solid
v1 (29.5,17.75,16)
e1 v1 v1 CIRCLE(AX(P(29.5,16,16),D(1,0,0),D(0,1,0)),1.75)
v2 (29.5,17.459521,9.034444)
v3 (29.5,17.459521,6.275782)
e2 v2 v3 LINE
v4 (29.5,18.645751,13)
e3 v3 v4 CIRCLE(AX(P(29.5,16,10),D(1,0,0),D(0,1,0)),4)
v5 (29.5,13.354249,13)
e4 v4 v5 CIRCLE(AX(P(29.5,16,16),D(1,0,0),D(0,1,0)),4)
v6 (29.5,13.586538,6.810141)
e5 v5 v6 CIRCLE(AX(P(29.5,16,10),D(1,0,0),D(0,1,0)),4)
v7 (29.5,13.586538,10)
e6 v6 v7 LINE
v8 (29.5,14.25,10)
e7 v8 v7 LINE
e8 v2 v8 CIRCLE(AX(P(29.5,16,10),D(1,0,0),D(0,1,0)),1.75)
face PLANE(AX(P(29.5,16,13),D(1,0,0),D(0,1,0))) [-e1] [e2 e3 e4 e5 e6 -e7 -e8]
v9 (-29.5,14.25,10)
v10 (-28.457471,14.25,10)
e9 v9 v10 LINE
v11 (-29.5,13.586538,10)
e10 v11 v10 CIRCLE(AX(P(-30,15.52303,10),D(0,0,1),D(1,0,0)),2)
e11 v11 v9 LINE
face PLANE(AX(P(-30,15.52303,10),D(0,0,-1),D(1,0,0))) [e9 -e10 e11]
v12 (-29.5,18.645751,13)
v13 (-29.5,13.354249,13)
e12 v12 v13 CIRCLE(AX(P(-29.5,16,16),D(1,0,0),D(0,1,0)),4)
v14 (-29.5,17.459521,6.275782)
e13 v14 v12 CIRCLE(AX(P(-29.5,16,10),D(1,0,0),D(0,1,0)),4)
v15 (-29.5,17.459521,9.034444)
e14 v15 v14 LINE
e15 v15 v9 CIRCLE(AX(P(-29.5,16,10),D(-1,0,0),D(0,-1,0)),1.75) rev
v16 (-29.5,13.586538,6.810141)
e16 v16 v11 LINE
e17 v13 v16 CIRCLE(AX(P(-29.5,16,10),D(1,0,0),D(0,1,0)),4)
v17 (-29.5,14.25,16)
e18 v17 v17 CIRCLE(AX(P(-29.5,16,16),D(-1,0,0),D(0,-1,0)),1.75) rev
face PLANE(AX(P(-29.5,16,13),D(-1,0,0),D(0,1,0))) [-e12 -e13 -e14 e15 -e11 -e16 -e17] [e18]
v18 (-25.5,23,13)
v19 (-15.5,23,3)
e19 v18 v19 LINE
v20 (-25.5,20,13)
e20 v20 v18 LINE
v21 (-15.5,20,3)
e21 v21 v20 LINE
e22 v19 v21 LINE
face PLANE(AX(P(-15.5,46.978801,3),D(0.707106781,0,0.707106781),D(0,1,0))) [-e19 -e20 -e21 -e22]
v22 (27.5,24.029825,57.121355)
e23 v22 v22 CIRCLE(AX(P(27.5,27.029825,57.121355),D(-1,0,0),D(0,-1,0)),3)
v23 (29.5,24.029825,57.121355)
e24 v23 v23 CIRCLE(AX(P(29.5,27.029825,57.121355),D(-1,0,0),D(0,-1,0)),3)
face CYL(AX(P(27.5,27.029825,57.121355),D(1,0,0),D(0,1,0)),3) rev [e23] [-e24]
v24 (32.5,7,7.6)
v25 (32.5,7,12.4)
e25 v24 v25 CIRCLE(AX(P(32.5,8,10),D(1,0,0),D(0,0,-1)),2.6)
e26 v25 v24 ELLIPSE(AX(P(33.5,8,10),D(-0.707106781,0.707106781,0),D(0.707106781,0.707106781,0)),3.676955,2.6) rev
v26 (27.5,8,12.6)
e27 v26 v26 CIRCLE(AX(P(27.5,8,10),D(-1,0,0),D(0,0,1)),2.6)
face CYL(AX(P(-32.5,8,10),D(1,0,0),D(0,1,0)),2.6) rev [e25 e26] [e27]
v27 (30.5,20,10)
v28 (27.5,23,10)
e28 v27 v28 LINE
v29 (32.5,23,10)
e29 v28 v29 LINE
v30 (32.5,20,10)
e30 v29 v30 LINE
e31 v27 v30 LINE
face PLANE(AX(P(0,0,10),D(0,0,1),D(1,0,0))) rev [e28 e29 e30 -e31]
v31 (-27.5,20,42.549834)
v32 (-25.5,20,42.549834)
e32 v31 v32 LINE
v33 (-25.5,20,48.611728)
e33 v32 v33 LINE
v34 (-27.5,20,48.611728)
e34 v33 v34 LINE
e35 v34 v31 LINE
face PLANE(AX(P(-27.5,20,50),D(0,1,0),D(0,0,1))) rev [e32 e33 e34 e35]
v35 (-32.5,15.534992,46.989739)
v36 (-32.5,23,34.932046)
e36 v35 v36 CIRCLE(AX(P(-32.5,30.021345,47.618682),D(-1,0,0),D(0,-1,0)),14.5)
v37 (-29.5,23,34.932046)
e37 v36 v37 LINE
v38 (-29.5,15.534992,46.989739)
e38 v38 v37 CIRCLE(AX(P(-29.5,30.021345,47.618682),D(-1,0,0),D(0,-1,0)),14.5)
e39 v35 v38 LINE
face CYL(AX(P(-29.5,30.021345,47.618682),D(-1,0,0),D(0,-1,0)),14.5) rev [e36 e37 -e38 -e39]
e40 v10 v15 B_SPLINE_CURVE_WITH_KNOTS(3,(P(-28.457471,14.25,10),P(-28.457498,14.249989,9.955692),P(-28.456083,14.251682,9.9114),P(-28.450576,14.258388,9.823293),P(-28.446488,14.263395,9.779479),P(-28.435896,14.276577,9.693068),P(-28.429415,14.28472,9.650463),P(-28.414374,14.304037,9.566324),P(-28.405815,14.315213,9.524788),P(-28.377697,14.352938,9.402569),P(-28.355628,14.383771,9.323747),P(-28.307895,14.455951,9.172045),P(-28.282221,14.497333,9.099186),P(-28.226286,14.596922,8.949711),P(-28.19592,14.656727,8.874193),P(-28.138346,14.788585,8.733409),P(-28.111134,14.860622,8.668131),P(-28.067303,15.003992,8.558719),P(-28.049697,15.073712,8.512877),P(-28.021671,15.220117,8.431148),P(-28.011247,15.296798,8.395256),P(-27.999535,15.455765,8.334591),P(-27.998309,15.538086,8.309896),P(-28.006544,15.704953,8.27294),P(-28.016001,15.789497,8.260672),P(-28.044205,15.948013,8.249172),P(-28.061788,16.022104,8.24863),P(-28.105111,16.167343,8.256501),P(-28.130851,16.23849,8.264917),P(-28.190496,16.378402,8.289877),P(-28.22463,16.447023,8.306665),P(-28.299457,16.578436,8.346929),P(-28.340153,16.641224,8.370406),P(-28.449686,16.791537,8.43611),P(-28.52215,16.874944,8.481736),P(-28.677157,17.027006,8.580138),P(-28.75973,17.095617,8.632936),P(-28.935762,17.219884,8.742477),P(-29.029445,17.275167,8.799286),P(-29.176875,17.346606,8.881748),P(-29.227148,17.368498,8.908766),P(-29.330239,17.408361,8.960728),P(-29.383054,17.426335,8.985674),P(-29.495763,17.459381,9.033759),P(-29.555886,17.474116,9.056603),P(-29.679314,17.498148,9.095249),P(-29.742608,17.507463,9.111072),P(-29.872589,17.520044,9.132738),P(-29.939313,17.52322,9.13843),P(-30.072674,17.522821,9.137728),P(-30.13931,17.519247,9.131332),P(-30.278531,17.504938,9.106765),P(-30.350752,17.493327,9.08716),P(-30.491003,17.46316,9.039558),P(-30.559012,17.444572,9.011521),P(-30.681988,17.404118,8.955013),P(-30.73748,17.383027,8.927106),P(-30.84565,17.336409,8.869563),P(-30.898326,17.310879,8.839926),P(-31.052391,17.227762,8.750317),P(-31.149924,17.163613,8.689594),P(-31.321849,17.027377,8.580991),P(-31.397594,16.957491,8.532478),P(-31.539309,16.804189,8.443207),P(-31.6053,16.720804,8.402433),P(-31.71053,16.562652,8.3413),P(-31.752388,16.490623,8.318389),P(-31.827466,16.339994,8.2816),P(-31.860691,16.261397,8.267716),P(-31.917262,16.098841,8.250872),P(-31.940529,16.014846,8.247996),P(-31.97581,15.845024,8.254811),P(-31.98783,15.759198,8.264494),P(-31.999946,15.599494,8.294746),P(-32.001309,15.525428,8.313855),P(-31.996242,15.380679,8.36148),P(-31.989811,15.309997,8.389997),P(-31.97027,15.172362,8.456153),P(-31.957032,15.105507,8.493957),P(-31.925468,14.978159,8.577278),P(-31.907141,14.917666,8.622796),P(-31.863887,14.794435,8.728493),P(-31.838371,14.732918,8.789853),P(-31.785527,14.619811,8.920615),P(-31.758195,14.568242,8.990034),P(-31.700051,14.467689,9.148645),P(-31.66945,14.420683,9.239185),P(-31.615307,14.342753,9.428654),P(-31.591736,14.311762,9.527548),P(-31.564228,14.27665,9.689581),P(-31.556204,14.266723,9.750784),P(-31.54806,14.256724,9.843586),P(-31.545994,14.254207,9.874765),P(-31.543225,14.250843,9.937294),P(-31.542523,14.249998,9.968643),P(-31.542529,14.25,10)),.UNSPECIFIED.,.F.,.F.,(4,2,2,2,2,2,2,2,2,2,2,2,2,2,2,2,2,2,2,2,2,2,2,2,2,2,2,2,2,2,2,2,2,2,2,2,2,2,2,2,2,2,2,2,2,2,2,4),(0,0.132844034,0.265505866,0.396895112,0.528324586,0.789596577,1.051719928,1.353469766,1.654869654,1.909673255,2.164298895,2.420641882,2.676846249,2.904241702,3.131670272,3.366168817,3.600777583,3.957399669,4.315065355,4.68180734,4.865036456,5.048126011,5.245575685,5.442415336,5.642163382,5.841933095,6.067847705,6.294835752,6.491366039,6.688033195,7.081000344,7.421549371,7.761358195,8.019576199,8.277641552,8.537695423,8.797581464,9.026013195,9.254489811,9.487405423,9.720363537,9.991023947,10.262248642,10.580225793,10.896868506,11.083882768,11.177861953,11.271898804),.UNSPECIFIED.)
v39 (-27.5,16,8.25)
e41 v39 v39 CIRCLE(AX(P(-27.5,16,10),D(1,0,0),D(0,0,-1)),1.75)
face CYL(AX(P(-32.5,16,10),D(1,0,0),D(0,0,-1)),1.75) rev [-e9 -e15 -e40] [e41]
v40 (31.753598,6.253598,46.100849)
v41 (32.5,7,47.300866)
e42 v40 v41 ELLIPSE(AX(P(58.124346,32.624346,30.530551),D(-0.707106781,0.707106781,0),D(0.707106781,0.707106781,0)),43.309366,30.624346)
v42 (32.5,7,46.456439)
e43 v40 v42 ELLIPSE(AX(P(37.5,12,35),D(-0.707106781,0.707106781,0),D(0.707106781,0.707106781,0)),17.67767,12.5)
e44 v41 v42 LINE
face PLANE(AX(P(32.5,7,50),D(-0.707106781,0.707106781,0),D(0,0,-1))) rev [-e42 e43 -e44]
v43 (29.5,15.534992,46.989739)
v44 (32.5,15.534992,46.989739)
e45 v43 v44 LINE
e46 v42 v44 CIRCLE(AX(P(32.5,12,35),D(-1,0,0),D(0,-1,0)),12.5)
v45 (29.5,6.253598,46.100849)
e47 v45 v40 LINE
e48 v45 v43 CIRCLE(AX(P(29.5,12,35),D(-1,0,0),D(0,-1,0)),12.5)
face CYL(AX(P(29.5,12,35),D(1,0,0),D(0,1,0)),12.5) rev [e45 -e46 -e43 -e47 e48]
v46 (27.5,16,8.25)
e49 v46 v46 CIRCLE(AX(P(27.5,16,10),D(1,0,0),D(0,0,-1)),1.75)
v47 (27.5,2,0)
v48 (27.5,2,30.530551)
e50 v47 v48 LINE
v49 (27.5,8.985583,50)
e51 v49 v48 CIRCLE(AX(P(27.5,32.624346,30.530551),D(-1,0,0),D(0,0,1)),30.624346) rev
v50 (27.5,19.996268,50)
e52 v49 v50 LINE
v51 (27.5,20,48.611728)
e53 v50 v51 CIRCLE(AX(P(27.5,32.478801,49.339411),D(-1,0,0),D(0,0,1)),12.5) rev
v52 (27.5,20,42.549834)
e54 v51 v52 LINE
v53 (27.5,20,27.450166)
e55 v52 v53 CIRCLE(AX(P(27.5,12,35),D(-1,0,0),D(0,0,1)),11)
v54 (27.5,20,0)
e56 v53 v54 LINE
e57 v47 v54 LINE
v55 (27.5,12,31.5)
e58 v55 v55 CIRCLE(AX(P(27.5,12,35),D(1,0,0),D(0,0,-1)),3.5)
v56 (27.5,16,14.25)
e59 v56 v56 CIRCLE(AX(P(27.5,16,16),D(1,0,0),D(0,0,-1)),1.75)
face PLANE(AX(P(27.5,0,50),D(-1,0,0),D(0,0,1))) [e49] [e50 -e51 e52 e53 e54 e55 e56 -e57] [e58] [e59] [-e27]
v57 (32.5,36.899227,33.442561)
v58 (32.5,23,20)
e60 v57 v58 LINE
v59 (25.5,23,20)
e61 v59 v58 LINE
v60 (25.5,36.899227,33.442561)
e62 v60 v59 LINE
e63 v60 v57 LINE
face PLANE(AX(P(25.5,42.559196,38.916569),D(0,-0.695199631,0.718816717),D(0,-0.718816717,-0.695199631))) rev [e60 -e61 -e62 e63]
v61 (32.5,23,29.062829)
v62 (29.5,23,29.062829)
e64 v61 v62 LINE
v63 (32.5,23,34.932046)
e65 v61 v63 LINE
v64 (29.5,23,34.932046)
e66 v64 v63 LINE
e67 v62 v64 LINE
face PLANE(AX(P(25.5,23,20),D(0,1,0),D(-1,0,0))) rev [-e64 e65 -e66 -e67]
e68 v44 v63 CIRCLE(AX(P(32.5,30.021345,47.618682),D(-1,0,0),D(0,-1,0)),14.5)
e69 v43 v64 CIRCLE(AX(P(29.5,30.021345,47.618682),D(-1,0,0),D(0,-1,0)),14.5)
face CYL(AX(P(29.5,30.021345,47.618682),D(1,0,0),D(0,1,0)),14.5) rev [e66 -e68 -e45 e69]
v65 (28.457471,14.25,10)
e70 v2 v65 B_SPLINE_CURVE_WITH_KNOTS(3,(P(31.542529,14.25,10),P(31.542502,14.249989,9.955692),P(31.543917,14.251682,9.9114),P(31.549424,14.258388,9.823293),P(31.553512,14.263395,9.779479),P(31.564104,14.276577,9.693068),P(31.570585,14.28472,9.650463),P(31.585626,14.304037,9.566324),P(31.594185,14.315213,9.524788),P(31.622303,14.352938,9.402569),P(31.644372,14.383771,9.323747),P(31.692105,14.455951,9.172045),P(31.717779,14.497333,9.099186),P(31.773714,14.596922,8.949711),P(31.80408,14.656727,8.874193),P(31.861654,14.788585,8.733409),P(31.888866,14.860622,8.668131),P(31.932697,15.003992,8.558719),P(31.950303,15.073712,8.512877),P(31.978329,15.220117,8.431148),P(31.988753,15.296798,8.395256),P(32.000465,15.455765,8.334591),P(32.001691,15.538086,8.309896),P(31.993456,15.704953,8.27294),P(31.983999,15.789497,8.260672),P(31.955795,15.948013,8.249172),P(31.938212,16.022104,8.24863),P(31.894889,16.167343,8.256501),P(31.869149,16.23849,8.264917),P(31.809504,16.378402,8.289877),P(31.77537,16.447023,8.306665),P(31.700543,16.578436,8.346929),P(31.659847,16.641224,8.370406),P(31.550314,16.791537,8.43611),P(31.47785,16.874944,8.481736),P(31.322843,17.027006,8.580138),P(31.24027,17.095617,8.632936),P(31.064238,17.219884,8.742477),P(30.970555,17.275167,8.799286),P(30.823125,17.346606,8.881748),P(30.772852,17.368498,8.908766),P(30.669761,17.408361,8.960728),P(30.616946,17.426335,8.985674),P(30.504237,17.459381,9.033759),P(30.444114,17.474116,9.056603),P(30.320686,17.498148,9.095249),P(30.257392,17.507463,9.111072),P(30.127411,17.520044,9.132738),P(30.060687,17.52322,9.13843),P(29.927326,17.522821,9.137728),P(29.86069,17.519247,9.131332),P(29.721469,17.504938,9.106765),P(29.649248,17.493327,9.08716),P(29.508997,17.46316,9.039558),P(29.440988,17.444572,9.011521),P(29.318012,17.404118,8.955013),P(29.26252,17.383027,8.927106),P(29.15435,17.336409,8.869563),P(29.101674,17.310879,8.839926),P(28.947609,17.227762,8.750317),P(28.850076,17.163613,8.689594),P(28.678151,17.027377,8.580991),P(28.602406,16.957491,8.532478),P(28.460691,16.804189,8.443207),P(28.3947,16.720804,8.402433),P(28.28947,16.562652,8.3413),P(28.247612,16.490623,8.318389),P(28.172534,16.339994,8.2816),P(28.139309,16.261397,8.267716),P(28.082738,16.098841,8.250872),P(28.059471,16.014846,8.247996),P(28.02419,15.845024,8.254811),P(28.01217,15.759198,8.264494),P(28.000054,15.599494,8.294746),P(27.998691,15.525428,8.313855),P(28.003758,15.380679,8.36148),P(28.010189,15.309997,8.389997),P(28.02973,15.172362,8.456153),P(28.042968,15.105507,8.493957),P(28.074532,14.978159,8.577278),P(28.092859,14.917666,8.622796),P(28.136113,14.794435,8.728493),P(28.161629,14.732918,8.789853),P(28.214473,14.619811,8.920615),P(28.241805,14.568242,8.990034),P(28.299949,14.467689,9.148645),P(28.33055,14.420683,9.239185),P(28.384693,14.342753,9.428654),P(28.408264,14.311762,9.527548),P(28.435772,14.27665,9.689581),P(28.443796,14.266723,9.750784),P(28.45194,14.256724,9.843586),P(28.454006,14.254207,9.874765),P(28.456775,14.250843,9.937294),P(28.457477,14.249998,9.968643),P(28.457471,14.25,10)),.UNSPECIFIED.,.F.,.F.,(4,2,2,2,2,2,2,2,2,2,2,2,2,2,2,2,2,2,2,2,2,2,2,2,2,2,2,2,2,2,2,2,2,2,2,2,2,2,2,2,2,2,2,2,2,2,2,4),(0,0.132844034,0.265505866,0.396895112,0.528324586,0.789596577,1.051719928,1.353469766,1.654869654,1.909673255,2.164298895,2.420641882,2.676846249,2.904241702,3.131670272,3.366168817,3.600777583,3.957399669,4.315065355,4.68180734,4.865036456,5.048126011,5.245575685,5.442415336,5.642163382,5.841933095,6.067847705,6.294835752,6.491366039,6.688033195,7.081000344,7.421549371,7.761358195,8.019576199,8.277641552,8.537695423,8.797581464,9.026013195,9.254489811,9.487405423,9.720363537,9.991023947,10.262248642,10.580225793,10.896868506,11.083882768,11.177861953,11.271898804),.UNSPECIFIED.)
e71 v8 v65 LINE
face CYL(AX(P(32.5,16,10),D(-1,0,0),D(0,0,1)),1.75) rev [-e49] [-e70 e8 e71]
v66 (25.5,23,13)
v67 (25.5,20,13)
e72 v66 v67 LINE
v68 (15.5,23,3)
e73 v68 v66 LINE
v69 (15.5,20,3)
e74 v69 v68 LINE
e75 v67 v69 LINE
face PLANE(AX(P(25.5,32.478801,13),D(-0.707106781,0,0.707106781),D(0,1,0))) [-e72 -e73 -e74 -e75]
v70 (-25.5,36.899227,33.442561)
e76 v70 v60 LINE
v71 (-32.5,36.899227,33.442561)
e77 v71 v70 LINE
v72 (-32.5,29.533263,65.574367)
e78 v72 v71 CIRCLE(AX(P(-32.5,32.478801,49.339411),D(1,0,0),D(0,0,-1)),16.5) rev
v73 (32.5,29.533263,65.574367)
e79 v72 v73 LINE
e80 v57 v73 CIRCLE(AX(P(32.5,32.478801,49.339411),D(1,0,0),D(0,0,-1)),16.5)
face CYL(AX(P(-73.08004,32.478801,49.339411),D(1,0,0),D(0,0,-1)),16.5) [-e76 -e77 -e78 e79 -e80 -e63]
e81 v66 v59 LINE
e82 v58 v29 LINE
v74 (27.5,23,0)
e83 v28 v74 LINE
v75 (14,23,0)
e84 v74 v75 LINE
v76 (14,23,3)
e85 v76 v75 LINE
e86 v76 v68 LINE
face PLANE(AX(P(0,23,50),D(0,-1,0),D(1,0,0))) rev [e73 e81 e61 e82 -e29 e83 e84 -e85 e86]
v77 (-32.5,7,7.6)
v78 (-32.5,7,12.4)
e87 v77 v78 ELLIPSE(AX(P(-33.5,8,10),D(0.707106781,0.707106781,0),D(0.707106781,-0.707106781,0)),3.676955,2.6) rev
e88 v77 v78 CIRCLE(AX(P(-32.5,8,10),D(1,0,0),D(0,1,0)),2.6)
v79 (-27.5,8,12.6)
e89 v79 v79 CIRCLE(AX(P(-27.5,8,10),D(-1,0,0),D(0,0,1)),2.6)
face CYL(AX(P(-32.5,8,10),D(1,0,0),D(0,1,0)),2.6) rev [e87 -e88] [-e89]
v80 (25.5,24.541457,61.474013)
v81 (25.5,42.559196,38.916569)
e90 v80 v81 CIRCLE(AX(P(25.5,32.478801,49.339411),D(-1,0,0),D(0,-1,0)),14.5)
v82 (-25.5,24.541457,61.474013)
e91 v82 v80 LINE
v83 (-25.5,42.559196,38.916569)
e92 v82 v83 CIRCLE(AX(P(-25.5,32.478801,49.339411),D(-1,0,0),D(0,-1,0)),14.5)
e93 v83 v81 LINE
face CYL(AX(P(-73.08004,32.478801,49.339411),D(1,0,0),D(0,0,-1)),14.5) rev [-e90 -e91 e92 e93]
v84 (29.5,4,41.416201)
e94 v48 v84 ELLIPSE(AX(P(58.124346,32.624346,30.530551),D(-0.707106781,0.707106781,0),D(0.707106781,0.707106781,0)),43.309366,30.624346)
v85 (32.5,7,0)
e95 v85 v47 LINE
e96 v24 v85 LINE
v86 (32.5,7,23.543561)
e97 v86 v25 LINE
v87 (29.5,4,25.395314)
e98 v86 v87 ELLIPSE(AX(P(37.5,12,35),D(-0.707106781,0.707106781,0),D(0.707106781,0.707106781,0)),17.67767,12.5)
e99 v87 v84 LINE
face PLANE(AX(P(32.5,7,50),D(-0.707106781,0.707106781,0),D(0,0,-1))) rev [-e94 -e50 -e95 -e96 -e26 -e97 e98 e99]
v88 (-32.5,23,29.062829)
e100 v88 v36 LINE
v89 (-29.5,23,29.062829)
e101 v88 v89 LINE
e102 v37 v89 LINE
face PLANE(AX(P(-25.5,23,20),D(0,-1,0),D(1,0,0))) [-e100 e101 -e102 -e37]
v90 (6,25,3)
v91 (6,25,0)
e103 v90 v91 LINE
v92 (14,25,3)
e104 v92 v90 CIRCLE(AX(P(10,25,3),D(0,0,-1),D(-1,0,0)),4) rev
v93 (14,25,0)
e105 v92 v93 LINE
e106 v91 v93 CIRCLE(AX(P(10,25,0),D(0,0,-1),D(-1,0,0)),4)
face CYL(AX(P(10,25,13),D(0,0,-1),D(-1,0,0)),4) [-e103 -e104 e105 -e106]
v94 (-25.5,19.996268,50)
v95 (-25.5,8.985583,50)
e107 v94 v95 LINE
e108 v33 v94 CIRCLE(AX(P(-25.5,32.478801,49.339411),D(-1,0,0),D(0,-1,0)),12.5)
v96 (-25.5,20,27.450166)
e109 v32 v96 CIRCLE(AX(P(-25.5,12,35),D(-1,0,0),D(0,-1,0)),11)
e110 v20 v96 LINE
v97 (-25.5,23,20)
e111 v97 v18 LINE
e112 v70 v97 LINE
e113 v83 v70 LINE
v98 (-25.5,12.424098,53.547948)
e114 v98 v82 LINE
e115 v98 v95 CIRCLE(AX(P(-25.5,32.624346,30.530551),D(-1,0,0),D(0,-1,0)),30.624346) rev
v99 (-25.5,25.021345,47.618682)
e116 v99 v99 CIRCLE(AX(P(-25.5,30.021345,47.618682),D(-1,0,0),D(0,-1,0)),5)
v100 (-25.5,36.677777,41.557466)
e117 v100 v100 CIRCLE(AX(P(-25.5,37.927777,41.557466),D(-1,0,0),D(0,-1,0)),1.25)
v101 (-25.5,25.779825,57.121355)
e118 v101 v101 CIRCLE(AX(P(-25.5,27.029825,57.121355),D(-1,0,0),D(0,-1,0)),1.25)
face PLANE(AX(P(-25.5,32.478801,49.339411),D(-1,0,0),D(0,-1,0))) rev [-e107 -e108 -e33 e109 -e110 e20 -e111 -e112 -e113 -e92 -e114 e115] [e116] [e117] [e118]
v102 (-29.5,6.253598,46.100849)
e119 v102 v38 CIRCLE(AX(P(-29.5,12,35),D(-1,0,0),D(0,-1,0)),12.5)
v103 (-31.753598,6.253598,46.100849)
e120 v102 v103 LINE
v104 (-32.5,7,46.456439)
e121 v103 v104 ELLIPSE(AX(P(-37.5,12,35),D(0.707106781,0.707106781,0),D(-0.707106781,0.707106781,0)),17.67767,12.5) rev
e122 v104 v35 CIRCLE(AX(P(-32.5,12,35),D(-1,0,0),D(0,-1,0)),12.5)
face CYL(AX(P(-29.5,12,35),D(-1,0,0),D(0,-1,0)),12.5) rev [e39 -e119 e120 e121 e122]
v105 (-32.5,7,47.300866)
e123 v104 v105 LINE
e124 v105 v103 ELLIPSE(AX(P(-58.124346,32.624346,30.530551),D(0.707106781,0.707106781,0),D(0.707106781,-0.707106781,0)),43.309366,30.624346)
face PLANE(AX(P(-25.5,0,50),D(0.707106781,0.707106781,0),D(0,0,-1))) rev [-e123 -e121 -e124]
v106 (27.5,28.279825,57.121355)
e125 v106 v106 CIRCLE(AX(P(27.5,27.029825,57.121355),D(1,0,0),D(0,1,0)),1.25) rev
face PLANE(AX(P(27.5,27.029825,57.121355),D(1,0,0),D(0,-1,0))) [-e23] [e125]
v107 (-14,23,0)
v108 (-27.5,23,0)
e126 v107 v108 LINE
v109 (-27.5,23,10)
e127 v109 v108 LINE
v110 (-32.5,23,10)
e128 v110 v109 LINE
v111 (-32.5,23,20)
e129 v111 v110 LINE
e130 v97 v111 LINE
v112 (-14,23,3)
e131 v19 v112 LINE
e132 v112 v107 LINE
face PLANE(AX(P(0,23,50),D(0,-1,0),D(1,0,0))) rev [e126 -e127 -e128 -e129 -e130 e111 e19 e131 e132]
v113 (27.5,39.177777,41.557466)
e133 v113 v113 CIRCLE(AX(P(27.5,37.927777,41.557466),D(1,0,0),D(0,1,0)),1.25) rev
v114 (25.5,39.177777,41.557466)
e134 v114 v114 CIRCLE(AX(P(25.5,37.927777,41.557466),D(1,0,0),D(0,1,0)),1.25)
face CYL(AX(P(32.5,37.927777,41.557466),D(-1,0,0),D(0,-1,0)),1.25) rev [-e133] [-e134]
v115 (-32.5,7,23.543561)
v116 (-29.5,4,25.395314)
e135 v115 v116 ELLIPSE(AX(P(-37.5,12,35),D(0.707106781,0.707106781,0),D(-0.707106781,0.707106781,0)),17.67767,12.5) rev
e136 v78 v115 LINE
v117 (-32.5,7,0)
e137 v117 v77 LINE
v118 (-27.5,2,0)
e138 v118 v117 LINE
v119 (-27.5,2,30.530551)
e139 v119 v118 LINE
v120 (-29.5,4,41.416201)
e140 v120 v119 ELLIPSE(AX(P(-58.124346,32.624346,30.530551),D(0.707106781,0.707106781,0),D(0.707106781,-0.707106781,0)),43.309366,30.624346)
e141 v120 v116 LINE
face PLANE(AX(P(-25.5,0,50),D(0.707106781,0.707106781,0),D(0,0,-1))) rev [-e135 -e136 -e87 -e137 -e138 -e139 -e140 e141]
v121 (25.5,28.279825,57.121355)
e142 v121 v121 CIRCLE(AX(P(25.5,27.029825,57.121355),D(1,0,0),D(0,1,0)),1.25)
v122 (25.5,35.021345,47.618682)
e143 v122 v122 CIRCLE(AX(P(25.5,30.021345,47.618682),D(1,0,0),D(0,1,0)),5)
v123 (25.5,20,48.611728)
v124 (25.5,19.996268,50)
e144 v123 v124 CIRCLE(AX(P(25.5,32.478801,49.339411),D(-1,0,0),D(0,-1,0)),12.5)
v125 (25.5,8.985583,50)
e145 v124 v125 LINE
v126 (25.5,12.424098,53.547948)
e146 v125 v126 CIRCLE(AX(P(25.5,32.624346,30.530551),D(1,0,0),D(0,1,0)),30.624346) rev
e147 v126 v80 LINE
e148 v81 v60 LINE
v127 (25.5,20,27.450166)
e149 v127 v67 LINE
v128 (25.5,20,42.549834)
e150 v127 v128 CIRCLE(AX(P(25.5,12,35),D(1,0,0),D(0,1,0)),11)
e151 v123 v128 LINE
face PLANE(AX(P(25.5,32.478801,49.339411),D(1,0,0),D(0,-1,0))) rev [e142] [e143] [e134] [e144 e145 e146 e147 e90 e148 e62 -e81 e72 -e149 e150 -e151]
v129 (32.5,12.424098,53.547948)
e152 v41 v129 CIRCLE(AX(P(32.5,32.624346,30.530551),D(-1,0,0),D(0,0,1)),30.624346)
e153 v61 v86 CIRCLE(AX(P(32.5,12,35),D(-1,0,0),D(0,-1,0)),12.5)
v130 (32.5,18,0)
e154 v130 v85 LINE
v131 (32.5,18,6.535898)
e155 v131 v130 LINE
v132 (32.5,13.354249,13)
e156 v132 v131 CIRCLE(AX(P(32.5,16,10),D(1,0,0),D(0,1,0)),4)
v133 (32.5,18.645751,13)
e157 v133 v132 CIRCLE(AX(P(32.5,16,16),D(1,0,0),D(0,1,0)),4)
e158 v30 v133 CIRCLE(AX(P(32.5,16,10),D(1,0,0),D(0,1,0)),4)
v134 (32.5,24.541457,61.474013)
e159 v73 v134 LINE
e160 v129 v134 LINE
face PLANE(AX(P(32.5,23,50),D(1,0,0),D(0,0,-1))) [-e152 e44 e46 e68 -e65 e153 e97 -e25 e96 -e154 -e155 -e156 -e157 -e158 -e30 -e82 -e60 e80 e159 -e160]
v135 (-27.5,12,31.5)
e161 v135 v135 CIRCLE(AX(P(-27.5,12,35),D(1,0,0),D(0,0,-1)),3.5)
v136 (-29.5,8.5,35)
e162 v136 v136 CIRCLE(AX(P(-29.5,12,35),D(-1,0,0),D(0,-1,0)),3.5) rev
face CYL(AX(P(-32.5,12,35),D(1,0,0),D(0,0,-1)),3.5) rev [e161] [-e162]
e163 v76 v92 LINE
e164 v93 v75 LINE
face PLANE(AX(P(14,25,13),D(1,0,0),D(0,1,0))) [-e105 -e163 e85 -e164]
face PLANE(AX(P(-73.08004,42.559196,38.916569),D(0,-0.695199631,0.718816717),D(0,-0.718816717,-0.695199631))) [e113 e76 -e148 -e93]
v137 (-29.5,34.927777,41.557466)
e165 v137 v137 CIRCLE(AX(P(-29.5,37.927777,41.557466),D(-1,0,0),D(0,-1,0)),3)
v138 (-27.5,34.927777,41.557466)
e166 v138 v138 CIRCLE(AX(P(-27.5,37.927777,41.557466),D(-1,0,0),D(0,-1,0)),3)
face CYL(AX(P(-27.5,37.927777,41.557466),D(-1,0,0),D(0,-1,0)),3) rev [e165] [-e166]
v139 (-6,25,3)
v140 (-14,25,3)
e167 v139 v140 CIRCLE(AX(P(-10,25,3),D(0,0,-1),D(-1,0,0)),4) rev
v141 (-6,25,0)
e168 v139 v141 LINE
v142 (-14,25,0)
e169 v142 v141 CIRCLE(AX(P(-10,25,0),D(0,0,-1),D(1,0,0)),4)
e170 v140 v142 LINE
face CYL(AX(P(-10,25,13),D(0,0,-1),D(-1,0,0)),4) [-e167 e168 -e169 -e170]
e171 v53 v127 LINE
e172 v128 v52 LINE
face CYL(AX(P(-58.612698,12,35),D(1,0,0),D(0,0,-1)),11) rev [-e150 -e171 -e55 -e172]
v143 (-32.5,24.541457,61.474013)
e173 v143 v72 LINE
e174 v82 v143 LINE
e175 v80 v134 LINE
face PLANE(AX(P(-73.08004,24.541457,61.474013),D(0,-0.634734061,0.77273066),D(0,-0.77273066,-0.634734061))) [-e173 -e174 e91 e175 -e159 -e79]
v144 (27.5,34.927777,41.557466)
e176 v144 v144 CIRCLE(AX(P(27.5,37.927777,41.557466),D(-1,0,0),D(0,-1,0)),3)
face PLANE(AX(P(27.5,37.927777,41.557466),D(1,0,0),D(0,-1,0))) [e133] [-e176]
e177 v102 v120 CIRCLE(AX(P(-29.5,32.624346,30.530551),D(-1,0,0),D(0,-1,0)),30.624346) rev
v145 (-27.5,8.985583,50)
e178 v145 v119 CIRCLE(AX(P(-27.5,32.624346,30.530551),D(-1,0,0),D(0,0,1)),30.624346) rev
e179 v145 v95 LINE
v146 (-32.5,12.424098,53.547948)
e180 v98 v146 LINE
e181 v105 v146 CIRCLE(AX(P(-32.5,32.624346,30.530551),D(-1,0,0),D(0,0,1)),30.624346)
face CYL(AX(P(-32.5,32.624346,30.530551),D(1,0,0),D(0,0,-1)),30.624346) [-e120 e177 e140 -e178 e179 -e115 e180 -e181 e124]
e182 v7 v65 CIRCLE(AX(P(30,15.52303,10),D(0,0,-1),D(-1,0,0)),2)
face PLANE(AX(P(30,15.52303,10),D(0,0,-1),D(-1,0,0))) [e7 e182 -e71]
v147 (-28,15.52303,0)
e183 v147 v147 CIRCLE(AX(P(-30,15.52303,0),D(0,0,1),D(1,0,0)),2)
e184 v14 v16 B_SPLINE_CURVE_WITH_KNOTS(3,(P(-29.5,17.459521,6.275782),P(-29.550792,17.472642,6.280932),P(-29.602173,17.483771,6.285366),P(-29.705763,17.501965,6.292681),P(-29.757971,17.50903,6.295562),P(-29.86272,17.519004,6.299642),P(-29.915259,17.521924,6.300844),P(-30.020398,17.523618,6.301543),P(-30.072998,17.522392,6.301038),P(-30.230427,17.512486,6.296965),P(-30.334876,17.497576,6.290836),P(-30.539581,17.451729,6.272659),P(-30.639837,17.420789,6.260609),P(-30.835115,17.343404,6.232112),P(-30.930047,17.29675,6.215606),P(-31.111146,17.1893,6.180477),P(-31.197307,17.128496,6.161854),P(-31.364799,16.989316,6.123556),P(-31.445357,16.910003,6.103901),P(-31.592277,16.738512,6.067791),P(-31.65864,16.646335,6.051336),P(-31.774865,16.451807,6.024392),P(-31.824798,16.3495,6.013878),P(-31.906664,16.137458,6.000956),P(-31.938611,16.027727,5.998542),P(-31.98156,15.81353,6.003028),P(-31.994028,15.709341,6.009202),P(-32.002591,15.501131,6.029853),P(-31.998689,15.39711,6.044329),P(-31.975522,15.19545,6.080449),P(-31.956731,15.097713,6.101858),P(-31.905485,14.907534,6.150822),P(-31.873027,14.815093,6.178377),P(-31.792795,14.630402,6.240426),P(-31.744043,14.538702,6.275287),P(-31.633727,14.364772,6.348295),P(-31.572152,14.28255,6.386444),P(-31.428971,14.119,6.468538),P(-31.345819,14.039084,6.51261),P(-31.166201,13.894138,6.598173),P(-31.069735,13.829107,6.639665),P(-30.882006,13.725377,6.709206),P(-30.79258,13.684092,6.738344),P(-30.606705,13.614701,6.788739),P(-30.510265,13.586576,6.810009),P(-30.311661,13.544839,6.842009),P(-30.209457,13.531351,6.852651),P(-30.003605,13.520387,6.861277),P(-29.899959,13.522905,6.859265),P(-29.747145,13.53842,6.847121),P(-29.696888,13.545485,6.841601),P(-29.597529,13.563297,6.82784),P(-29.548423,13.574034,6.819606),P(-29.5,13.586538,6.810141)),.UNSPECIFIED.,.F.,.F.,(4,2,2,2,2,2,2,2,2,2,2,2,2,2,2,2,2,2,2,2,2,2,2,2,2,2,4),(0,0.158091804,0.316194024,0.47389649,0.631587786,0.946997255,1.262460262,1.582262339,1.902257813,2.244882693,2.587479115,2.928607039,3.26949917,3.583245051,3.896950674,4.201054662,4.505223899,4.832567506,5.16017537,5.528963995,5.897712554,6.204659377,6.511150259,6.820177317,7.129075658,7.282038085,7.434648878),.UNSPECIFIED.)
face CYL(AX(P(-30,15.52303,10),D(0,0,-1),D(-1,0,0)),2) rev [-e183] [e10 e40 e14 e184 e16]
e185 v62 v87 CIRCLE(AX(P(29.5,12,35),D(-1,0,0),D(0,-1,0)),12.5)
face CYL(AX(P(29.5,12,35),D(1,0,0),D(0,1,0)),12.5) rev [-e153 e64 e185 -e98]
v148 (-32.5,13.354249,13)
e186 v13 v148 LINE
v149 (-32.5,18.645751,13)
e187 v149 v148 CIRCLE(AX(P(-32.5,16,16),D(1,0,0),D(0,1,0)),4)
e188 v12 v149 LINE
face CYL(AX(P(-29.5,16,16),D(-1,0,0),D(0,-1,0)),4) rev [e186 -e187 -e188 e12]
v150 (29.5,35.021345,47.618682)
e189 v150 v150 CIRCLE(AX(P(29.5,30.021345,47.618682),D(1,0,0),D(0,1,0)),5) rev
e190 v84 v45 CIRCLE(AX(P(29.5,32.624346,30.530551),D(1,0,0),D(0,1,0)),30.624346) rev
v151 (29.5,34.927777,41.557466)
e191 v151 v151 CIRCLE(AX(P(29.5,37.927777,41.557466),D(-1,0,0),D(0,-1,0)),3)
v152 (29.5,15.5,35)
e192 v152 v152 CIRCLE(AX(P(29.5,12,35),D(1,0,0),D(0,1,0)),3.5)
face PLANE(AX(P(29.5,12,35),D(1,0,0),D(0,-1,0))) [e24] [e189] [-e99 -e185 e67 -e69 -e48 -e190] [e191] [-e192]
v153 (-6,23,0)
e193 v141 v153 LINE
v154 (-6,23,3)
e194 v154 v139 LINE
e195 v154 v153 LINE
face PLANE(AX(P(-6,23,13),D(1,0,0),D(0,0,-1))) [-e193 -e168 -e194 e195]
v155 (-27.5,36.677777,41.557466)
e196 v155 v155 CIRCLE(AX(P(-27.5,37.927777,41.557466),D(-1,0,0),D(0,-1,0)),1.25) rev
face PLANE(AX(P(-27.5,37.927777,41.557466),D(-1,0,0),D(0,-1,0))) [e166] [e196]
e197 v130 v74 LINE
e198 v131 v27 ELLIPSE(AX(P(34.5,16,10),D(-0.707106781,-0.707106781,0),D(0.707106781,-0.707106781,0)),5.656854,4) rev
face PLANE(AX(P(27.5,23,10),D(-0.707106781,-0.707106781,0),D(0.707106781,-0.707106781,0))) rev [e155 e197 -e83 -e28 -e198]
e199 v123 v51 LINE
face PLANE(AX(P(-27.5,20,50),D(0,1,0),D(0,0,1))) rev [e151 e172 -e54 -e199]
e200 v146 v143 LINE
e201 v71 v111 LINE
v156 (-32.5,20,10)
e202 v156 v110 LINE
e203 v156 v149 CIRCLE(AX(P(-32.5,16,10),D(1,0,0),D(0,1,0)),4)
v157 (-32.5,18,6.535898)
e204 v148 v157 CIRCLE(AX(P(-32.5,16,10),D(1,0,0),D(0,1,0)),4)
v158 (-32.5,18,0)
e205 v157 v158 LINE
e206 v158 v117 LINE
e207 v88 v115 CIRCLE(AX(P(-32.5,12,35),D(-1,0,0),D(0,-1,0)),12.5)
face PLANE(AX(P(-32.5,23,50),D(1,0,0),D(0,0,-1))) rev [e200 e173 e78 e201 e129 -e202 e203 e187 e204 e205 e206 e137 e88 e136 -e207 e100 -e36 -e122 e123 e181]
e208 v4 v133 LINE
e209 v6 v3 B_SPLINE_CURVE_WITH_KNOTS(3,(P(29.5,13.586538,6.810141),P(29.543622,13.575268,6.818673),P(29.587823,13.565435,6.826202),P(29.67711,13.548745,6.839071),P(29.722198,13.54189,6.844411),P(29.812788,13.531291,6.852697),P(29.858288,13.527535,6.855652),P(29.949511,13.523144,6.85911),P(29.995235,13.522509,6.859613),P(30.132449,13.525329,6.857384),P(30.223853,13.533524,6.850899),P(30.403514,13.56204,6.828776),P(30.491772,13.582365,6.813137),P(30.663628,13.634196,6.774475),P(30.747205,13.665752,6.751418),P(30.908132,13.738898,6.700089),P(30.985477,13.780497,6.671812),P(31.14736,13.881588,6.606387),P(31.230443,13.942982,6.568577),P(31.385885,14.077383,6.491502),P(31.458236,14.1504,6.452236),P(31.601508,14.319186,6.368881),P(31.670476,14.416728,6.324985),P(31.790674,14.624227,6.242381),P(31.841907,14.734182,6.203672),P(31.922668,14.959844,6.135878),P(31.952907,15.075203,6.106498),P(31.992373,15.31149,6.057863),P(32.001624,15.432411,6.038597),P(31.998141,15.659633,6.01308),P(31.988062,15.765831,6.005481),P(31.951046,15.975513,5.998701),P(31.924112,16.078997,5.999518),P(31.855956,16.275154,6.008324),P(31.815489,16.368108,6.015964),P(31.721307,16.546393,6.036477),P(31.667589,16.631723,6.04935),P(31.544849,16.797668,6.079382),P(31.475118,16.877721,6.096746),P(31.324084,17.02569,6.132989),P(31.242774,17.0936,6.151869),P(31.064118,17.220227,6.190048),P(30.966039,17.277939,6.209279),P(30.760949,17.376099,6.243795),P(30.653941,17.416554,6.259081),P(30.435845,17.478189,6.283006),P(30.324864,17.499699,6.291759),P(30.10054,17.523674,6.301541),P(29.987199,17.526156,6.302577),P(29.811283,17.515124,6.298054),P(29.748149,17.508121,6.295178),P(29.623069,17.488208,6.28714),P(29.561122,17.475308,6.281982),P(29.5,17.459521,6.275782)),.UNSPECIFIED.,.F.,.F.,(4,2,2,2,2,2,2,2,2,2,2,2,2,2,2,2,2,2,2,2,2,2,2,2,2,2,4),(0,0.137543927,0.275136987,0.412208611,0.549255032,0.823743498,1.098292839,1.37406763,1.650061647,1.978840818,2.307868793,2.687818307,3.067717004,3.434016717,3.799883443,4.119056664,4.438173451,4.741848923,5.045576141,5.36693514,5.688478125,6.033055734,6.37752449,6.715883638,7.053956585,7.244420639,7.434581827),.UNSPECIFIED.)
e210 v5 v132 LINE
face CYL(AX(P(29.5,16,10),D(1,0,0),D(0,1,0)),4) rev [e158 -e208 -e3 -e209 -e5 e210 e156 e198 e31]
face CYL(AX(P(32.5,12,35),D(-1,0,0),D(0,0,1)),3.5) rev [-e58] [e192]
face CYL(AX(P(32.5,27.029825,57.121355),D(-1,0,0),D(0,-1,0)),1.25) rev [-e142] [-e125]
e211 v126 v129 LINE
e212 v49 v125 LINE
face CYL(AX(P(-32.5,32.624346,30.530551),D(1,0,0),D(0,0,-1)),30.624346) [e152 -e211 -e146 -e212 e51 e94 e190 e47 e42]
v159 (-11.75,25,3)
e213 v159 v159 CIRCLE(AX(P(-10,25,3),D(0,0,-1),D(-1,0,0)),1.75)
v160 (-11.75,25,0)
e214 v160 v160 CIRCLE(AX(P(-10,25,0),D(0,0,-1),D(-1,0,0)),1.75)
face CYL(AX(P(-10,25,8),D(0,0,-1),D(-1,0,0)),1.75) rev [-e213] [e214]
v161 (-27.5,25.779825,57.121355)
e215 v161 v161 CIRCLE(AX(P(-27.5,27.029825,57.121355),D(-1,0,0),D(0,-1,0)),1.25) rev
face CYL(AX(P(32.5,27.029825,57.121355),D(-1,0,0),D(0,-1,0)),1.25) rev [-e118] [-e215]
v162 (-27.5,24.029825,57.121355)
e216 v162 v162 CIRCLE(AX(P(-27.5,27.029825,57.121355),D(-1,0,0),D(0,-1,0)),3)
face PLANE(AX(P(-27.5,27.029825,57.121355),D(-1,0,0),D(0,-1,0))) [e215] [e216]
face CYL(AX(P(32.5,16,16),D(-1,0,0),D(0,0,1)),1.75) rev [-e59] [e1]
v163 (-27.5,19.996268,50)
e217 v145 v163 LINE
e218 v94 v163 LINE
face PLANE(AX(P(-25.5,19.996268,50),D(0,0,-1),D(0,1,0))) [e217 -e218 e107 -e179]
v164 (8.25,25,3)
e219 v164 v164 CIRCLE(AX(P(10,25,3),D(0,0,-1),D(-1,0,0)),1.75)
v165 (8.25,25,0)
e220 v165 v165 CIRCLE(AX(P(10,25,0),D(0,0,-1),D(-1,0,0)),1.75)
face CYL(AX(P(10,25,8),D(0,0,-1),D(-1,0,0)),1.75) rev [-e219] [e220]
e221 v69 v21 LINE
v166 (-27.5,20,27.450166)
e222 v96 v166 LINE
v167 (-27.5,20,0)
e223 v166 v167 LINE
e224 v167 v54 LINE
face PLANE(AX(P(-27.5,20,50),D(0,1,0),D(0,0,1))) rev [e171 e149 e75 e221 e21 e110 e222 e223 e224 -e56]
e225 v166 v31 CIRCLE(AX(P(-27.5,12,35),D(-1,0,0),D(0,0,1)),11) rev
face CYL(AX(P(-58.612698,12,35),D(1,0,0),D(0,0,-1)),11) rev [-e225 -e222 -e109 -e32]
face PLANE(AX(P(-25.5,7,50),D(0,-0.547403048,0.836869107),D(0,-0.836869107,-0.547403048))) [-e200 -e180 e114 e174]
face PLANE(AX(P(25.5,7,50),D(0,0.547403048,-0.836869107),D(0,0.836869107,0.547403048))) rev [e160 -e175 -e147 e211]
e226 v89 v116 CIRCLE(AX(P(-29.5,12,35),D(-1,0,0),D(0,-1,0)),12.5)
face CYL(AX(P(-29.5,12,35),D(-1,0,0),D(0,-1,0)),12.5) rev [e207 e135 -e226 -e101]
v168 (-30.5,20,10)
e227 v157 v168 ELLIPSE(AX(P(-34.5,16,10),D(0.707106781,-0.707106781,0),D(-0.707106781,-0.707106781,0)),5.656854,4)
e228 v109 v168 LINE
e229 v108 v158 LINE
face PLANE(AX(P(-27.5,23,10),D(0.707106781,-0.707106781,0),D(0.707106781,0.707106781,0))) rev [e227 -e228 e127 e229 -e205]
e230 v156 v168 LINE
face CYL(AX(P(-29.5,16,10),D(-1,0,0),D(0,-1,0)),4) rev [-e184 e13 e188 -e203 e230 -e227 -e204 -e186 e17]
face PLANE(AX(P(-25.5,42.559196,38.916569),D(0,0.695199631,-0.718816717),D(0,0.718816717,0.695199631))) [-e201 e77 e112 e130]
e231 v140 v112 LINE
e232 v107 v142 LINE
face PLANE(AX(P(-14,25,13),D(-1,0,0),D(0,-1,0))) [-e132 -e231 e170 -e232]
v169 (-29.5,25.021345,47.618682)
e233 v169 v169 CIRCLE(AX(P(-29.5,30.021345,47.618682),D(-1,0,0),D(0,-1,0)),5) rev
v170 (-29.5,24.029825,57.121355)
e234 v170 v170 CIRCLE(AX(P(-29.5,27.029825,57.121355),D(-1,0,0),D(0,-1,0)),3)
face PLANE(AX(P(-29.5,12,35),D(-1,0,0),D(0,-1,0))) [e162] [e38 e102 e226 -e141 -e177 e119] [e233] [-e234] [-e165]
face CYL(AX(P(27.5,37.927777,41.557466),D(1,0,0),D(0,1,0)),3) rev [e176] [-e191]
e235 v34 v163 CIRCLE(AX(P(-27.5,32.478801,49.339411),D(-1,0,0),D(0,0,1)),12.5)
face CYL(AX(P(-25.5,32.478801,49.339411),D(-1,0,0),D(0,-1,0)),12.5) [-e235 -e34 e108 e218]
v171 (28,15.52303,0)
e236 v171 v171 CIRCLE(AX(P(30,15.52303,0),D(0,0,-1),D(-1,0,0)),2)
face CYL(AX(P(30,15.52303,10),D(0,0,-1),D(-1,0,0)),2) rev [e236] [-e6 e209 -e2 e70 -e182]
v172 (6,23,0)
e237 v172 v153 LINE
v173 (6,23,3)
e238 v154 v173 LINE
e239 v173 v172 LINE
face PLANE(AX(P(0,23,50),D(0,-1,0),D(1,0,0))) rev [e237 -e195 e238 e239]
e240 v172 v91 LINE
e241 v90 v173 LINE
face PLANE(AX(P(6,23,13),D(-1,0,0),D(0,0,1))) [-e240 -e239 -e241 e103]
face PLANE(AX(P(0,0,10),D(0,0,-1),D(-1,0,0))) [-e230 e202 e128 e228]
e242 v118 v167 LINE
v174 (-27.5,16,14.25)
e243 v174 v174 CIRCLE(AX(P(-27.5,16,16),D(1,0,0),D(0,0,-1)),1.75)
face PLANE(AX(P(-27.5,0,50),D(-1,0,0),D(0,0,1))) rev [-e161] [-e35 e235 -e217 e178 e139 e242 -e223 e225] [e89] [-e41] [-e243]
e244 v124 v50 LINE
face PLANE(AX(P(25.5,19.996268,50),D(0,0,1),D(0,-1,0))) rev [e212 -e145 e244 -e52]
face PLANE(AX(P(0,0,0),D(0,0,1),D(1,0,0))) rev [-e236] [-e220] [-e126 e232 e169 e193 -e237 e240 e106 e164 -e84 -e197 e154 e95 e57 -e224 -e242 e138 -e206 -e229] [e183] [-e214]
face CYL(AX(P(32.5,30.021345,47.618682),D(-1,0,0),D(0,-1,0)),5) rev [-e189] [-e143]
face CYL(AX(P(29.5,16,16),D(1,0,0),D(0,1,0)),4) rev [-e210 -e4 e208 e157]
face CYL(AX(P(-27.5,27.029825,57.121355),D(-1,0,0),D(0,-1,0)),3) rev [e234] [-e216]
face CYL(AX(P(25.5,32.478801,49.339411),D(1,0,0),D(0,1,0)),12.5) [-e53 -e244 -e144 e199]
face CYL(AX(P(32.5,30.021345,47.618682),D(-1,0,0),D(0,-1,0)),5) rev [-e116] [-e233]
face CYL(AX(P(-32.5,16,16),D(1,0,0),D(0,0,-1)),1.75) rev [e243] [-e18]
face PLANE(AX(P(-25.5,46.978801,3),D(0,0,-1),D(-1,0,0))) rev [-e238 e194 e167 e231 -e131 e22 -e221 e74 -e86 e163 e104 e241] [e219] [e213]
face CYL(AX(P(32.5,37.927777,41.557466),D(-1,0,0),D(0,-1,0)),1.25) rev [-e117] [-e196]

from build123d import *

# Parameters (mm, degrees)
BOSS_EXTRUDE1_DEPTH             = 50
CHAMFER1_SIZE                   = 7
SKETCH2_R                       = 3.5
CUT_EXTRUDE1_DEPTH              = 62.524385409
SKETCH3_R                       = 1.75
CUT_EXTRUDE2_DEPTH              = 62.524385409
SKETCH5_R                       = 12.5
CUT_EXTRUDE4_DEPTH              = 3
BOSS_EXTRUDE2_DEPTH             = 7
CUT_EXTRUDE3_DEPTH              = 77.547867994
CUT_EXTRUDE3_DEPTH_BACK         = 77.547867994
SKETCH4_W                       = 51
SKETCH4_H                       = 47
SKETCH7_R                       = 1.25
SKETCH7_R_2                     = 5
CUT_EXTRUDE5_DEPTH              = 103.505990745
SKETCH8_R                       = 14.5
CUT_EXTRUDE6_DEPTH              = 3
SKETCH9_R                       = 3
CUT_EXTRUDE7_DEPTH              = 2
SKETCH11_R                      = 2
CUT_EXTRUDE8_DEPTH              = 10
BOSS_EXTRUDE3_START             = -32.5
BOSS_EXTRUDE3_DEPTH             = 65
SKETCH12_R                      = 2.6
CUT_EXTRUDE9_DEPTH              = 105.684053225
CUT_EXTRUDE10_DEPTH             = 3
BOSS_EXTRUDE4_DEPTH             = 3
SKETCH16_R                      = 1.75
CUT_EXTRUDE12_DEPTH             = 8
CHAMFER2_SIZE                   = 10
CUT_EXTRUDE14_DEPTH             = 10
CUT_EXTRUDE15_DEPTH             = 89.260982281
CUT_EXTRUDE15_DEPTH_BACK        = 89.260982281
CUT_EXTRUDE16_REACH             = 90.261
SKETCH19_R                      = 11
CUT_EXTRUDE16_DIRECTION_2_REACH = 90.261


# Read off the part's stored shape, not the designer's step: Mirror1
with BuildPart() as part:
    # Sketch1 → Boss-Extrude1 (new body)
    with BuildSketch(Plane.XY):
        Polygon((-27.5, 0), (-27.5, 20), (0, 20), (0, 23), (-32.5, 23), (-32.5, 0), align=None)
    extrude(amount=BOSS_EXTRUDE1_DEPTH)

    # Chamfer1
    # the kernel refuses this chamfer: 7 mm, written as the material it takes off along each edge
    with BuildSketch(Plane(origin=(-32.5, 0, -18.001780916), x_dir=(-0.02749587661058612, 0.9996219169112968, 0), z_dir=(0, 0, 1))) as chamfer1_piece_1:
        Polygon((CHAMFER1_SIZE * 0.999621916911, -CHAMFER1_SIZE * 0.0274958766106), (-CHAMFER1_SIZE * 0.0274958766106, -CHAMFER1_SIZE * 0.999621916911), (0, 0), align=None)
    extrude(amount=86.003561832, mode=Mode.SUBTRACT)

    # Sketch2 → Cut-Extrude1 (cut, through all)
    with BuildSketch(Plane(origin=(-27.5, 0, 0), x_dir=(0, 0, -1), z_dir=(1, 0, 0))):
        with Locations((-35, 12)):
            Circle(SKETCH2_R)
    extrude(amount=-CUT_EXTRUDE1_DEPTH, mode=Mode.SUBTRACT)

    # Sketch3 → Cut-Extrude2 (cut, through all)
    with BuildSketch(Plane(origin=(-27.5, 0, 0), x_dir=(0, 0, -1), z_dir=(1, 0, 0))):
        with Locations((-10, 16)):
            Circle(SKETCH3_R)
        with Locations((-16, 16)):
            Circle(SKETCH3_R)
    extrude(amount=-CUT_EXTRUDE2_DEPTH, mode=Mode.SUBTRACT)

    # Sketch5 → Cut-Extrude4 (cut)
    with BuildSketch(Plane.ZY.offset(32.5)):
        with Locations((35, 12)):
            Circle(SKETCH5_R)
    extrude(amount=-CUT_EXTRUDE4_DEPTH, mode=Mode.SUBTRACT)

    # Sketch6 → Boss-Extrude2 (add)
    with BuildSketch(Plane.ZY.offset(32.5)):
        with BuildLine():
            Line((38.91656851, 42.559195759), (20, 23))
            Line((20, 23), (41.190648452, 23))
            ThreePointArc((41.190648452, 23), (45.305332833, 20.647646722), (50, 19.996268429))
            Line((50, 19.996268429), (50, 7))
            Line((50, 7), (61.474012963, 24.541456905))
            ThreePointArc((61.474012963, 24.541456905), (58.38884507, 43.808308659), (38.91656851, 42.559195759))
        make_face()
    extrude(amount=-BOSS_EXTRUDE2_DEPTH)

    # Mirror1: part across plane


with BuildPart() as part_1:
    add(part.part)
    add(part.part.mirror(Plane(origin=(0, 0, 0), x_dir=(0, 0, 1), z_dir=(1, 0, 0))))

    # Sketch4 → Cut-Extrude3 (cut, two sides: drawn at the far end of the back side and taken through both)
    with BuildSketch(Plane.XZ.offset(-20).offset(-CUT_EXTRUDE3_DEPTH_BACK)):
        with Locations((0, 26.5)):
            Rectangle(SKETCH4_W, SKETCH4_H)
    extrude(amount=CUT_EXTRUDE3_DEPTH + CUT_EXTRUDE3_DEPTH_BACK, mode=Mode.SUBTRACT)

    # Sketch7 → Cut-Extrude5 (cut, through all)
    with BuildSketch(Plane.ZY.offset(32.5)):
        with Locations(Location((41.557466488, 37.927777253, 0), (0, 0, 270))):
            Circle(SKETCH7_R)
        with Locations(Location((57.12135533, 27.029824962, 0), (0, 0, 270))):
            Circle(SKETCH7_R)
        with Locations(Location((47.6186816, 30.021344974, 0), (0, 0, 270))):
            Circle(SKETCH7_R_2)
    extrude(amount=-CUT_EXTRUDE5_DEPTH, mode=Mode.SUBTRACT)

    # Sketch8 → Cut-Extrude6 (cut)
    with BuildSketch(Plane.ZY.offset(32.5)):
        with Locations((47.6186816, 30.021344974)):
            Circle(SKETCH8_R)
    cut_extrude6 = extrude(amount=-CUT_EXTRUDE6_DEPTH, mode=Mode.SUBTRACT)

    # Sketch9 → Cut-Extrude7 (cut)
    with BuildSketch(Plane.ZY.offset(29.5)):
        with Locations(Location((41.557466488, 37.927777253, 0), (0, 0, 270))):
            Circle(SKETCH9_R)
        with Locations(Location((57.12135533, 27.029824962, 0), (0, 0, 270))):
            Circle(SKETCH9_R)
    cut_extrude7 = extrude(amount=-CUT_EXTRUDE7_DEPTH, mode=Mode.SUBTRACT)

    # Sketch11 → Cut-Extrude8 (cut)
    with BuildSketch(Plane(origin=(0, 0, 0), x_dir=(-1, 0, 0), z_dir=(0, 0, -1))):
        with Locations((-30, 15.523029521)):
            Circle(SKETCH11_R)
    cut_extrude8 = extrude(amount=-CUT_EXTRUDE8_DEPTH, mode=Mode.SUBTRACT)

    # Mirror2: Cut-Extrude6, Cut-Extrude7, Cut-Extrude8 across plane
    add(cut_extrude6.mirror(Plane(origin=(0, 0, 0), x_dir=(0, 0, 1), z_dir=(1, 0, 0))), mode=Mode.SUBTRACT)
    add(cut_extrude7.mirror(Plane(origin=(0, 0, 0), x_dir=(0, 0, 1), z_dir=(1, 0, 0))), mode=Mode.SUBTRACT)
    add(cut_extrude8.mirror(Plane(origin=(0, 0, 0), x_dir=(0, 0, 1), z_dir=(1, 0, 0))), mode=Mode.SUBTRACT)

    # Sketch10 → Boss-Extrude3 (add)
    with BuildSketch(Plane(origin=(0, 0, 0), x_dir=(0, 0, -1), z_dir=(1, 0, 0)).offset(BOSS_EXTRUDE3_START)):
        with BuildLine():
            Line((-38.91656851, 42.559195759), (-33.44256114, 36.899227268))
            ThreePointArc((-33.44256114, 36.899227268), (-53.026270805, 48.561620018), (-65.574367209, 29.533263138))
            Line((-65.574367209, 29.533263138), (-61.474012963, 24.541456905))
            ThreePointArc((-61.474012963, 24.541456905), (-58.38884507, 43.808308659), (-38.91656851, 42.559195759))
        make_face()
    extrude(amount=BOSS_EXTRUDE3_DEPTH)

    # Sketch12 → Cut-Extrude9 (cut, through all)
    with BuildSketch(Plane(origin=(32.5, 0, 0), x_dir=(0, 0, -1), z_dir=(1, 0, 0))):
        with Locations(Location((-10, 8, 0), (0, 0, 180))):
            Circle(SKETCH12_R)
    extrude(amount=-CUT_EXTRUDE9_DEPTH, mode=Mode.SUBTRACT)

    # Sketch13 → Cut-Extrude10 (cut)
    with BuildSketch(Plane(origin=(32.5, 0, 0), x_dir=(0, 0, -1), z_dir=(1, 0, 0))):
        with BuildLine():
            ThreePointArc((-13, 18.645751311), (-20, 16), (-13, 13.354248689))
            ThreePointArc((-13, 13.354248689), (-6, 16), (-13, 18.645751311))
        make_face()
    cut_extrude10 = extrude(amount=-CUT_EXTRUDE10_DEPTH, mode=Mode.SUBTRACT)

    # Mirror3: Cut-Extrude10 across plane
    add(cut_extrude10.mirror(Plane(origin=(0, 0, 0), x_dir=(0, 0, 1), z_dir=(1, 0, 0))), mode=Mode.SUBTRACT)

    # Sketch15 → Boss-Extrude4 (add)
    with BuildSketch(Plane(origin=(0, 0, 0), x_dir=(-1, 0, 0), z_dir=(0, 0, -1))):
        with BuildLine():
            Line((-14, 25), (-14, 23))
            Line((-14, 23), (-6, 23))
            Line((-6, 23), (-6, 25))
            ThreePointArc((-6, 25), (-10, 29), (-14, 25))
        make_face()
        with BuildLine():
            Line((6, 23), (6, 25))
            ThreePointArc((6, 25), (10, 29), (14, 25))
            Line((14, 25), (14, 23))
            Line((14, 23), (6, 23))
        make_face()
    extrude(amount=-BOSS_EXTRUDE4_DEPTH)

    # Sketch16 → Cut-Extrude12 (cut)
    with BuildSketch(Plane(origin=(0, 0, 0), x_dir=(-1, 0, 0), z_dir=(0, 0, -1))):
        with Locations((-10, 25)):
            Circle(SKETCH16_R)
        with Locations((10, 25)):
            Circle(SKETCH16_R)
    extrude(amount=-CUT_EXTRUDE12_DEPTH, mode=Mode.SUBTRACT)

    # Chamfer2
    chamfer2_edges = [part_1.edges().sort_by_distance(p)[0] for p in [
        (25.5, 21.5, 3),
        (-25.5, 21.5, 3),
    ]]
    chamfer(chamfer2_edges, length=CHAMFER2_SIZE)

    # Sketch17 → Cut-Extrude14 (cut)
    with BuildSketch(Plane(origin=(0, 0, 0), x_dir=(-1, 0, 0), z_dir=(0, 0, -1))):
        Polygon((-32.5, 18), (-32.5, 23), (-27.5, 23), align=None)
        Polygon((32.5, 23), (27.5, 23), (32.5, 18), align=None)
    extrude(amount=-CUT_EXTRUDE14_DEPTH, mode=Mode.SUBTRACT)

    # Sketch18 → Cut-Extrude15 (cut, two sides: drawn at the far end of the back side and taken through both)
    with BuildSketch(Plane(origin=(0, 0, 0), x_dir=(0, 0, -1), z_dir=(1, 0, 0)).offset(-CUT_EXTRUDE15_DEPTH_BACK)):
        with BuildLine():
            Line((-30.530550933, 2), (-50, 2))
            Line((-50, 2), (-58.261274719, 19.629826629))
            ThreePointArc((-58.261274719, 19.629826629), (-46.960735265, 6.780592155), (-30.530550933, 2))
        make_face()
    extrude(amount=CUT_EXTRUDE15_DEPTH + CUT_EXTRUDE15_DEPTH_BACK, mode=Mode.SUBTRACT)

    # Cut-Extrude16: up to this face of the body (flat: up to its plane)
    cut_extrude16_end = Plane(part_1.part.faces().sort_by_distance((-27.5, 11.293188811, 24.090581316))[0])
    # Sketch19 → Cut-Extrude16 (cut, up to the picked face)
    with BuildSketch(Plane(origin=(0, 0, 0), x_dir=(0, 0, -1), z_dir=(1, 0, 0)), mode=Mode.PRIVATE) as cut_extrude16_sk1:
        with Locations((-35, 12)):
            Circle(SKETCH19_R)
    cut_extrude16_tool1 = split(extrude(cut_extrude16_sk1.sketch, amount=-CUT_EXTRUDE16_REACH, mode=Mode.PRIVATE), bisect_by=cut_extrude16_end, keep=Keep.BOTH, mode=Mode.PRIVATE)
    add(cut_extrude16_tool1.solids().sort_by(Axis((0, 12, 35), (-1, 0, 0)))[0], mode=Mode.SUBTRACT)

    # Cut-Extrude16 direction 2: up to this face of the body (flat: up to its plane)
    cut_extrude16_direction_2_end = Plane(part_1.part.faces().sort_by_distance((27.5, 11.293188811, 24.090581316))[0])
    # Sketch19 → Cut-Extrude16 direction 2 (cut, up to the picked face)
    with BuildSketch(Plane(origin=(0, 0, 0), x_dir=(0, 0, -1), z_dir=(1, 0, 0)), mode=Mode.PRIVATE) as cut_extrude16_direction_2_sk1:
        with Locations((-35, 12)):
            Circle(SKETCH19_R)
    cut_extrude16_direction_2_tool1 = split(extrude(cut_extrude16_direction_2_sk1.sketch, amount=CUT_EXTRUDE16_DIRECTION_2_REACH, mode=Mode.PRIVATE), bisect_by=cut_extrude16_direction_2_end, keep=Keep.BOTH, mode=Mode.PRIVATE)
    add(cut_extrude16_direction_2_tool1.solids().sort_by(Axis((0, 12, 35), (1, 0, 0)))[0], mode=Mode.SUBTRACT)


solid = part_1.part
